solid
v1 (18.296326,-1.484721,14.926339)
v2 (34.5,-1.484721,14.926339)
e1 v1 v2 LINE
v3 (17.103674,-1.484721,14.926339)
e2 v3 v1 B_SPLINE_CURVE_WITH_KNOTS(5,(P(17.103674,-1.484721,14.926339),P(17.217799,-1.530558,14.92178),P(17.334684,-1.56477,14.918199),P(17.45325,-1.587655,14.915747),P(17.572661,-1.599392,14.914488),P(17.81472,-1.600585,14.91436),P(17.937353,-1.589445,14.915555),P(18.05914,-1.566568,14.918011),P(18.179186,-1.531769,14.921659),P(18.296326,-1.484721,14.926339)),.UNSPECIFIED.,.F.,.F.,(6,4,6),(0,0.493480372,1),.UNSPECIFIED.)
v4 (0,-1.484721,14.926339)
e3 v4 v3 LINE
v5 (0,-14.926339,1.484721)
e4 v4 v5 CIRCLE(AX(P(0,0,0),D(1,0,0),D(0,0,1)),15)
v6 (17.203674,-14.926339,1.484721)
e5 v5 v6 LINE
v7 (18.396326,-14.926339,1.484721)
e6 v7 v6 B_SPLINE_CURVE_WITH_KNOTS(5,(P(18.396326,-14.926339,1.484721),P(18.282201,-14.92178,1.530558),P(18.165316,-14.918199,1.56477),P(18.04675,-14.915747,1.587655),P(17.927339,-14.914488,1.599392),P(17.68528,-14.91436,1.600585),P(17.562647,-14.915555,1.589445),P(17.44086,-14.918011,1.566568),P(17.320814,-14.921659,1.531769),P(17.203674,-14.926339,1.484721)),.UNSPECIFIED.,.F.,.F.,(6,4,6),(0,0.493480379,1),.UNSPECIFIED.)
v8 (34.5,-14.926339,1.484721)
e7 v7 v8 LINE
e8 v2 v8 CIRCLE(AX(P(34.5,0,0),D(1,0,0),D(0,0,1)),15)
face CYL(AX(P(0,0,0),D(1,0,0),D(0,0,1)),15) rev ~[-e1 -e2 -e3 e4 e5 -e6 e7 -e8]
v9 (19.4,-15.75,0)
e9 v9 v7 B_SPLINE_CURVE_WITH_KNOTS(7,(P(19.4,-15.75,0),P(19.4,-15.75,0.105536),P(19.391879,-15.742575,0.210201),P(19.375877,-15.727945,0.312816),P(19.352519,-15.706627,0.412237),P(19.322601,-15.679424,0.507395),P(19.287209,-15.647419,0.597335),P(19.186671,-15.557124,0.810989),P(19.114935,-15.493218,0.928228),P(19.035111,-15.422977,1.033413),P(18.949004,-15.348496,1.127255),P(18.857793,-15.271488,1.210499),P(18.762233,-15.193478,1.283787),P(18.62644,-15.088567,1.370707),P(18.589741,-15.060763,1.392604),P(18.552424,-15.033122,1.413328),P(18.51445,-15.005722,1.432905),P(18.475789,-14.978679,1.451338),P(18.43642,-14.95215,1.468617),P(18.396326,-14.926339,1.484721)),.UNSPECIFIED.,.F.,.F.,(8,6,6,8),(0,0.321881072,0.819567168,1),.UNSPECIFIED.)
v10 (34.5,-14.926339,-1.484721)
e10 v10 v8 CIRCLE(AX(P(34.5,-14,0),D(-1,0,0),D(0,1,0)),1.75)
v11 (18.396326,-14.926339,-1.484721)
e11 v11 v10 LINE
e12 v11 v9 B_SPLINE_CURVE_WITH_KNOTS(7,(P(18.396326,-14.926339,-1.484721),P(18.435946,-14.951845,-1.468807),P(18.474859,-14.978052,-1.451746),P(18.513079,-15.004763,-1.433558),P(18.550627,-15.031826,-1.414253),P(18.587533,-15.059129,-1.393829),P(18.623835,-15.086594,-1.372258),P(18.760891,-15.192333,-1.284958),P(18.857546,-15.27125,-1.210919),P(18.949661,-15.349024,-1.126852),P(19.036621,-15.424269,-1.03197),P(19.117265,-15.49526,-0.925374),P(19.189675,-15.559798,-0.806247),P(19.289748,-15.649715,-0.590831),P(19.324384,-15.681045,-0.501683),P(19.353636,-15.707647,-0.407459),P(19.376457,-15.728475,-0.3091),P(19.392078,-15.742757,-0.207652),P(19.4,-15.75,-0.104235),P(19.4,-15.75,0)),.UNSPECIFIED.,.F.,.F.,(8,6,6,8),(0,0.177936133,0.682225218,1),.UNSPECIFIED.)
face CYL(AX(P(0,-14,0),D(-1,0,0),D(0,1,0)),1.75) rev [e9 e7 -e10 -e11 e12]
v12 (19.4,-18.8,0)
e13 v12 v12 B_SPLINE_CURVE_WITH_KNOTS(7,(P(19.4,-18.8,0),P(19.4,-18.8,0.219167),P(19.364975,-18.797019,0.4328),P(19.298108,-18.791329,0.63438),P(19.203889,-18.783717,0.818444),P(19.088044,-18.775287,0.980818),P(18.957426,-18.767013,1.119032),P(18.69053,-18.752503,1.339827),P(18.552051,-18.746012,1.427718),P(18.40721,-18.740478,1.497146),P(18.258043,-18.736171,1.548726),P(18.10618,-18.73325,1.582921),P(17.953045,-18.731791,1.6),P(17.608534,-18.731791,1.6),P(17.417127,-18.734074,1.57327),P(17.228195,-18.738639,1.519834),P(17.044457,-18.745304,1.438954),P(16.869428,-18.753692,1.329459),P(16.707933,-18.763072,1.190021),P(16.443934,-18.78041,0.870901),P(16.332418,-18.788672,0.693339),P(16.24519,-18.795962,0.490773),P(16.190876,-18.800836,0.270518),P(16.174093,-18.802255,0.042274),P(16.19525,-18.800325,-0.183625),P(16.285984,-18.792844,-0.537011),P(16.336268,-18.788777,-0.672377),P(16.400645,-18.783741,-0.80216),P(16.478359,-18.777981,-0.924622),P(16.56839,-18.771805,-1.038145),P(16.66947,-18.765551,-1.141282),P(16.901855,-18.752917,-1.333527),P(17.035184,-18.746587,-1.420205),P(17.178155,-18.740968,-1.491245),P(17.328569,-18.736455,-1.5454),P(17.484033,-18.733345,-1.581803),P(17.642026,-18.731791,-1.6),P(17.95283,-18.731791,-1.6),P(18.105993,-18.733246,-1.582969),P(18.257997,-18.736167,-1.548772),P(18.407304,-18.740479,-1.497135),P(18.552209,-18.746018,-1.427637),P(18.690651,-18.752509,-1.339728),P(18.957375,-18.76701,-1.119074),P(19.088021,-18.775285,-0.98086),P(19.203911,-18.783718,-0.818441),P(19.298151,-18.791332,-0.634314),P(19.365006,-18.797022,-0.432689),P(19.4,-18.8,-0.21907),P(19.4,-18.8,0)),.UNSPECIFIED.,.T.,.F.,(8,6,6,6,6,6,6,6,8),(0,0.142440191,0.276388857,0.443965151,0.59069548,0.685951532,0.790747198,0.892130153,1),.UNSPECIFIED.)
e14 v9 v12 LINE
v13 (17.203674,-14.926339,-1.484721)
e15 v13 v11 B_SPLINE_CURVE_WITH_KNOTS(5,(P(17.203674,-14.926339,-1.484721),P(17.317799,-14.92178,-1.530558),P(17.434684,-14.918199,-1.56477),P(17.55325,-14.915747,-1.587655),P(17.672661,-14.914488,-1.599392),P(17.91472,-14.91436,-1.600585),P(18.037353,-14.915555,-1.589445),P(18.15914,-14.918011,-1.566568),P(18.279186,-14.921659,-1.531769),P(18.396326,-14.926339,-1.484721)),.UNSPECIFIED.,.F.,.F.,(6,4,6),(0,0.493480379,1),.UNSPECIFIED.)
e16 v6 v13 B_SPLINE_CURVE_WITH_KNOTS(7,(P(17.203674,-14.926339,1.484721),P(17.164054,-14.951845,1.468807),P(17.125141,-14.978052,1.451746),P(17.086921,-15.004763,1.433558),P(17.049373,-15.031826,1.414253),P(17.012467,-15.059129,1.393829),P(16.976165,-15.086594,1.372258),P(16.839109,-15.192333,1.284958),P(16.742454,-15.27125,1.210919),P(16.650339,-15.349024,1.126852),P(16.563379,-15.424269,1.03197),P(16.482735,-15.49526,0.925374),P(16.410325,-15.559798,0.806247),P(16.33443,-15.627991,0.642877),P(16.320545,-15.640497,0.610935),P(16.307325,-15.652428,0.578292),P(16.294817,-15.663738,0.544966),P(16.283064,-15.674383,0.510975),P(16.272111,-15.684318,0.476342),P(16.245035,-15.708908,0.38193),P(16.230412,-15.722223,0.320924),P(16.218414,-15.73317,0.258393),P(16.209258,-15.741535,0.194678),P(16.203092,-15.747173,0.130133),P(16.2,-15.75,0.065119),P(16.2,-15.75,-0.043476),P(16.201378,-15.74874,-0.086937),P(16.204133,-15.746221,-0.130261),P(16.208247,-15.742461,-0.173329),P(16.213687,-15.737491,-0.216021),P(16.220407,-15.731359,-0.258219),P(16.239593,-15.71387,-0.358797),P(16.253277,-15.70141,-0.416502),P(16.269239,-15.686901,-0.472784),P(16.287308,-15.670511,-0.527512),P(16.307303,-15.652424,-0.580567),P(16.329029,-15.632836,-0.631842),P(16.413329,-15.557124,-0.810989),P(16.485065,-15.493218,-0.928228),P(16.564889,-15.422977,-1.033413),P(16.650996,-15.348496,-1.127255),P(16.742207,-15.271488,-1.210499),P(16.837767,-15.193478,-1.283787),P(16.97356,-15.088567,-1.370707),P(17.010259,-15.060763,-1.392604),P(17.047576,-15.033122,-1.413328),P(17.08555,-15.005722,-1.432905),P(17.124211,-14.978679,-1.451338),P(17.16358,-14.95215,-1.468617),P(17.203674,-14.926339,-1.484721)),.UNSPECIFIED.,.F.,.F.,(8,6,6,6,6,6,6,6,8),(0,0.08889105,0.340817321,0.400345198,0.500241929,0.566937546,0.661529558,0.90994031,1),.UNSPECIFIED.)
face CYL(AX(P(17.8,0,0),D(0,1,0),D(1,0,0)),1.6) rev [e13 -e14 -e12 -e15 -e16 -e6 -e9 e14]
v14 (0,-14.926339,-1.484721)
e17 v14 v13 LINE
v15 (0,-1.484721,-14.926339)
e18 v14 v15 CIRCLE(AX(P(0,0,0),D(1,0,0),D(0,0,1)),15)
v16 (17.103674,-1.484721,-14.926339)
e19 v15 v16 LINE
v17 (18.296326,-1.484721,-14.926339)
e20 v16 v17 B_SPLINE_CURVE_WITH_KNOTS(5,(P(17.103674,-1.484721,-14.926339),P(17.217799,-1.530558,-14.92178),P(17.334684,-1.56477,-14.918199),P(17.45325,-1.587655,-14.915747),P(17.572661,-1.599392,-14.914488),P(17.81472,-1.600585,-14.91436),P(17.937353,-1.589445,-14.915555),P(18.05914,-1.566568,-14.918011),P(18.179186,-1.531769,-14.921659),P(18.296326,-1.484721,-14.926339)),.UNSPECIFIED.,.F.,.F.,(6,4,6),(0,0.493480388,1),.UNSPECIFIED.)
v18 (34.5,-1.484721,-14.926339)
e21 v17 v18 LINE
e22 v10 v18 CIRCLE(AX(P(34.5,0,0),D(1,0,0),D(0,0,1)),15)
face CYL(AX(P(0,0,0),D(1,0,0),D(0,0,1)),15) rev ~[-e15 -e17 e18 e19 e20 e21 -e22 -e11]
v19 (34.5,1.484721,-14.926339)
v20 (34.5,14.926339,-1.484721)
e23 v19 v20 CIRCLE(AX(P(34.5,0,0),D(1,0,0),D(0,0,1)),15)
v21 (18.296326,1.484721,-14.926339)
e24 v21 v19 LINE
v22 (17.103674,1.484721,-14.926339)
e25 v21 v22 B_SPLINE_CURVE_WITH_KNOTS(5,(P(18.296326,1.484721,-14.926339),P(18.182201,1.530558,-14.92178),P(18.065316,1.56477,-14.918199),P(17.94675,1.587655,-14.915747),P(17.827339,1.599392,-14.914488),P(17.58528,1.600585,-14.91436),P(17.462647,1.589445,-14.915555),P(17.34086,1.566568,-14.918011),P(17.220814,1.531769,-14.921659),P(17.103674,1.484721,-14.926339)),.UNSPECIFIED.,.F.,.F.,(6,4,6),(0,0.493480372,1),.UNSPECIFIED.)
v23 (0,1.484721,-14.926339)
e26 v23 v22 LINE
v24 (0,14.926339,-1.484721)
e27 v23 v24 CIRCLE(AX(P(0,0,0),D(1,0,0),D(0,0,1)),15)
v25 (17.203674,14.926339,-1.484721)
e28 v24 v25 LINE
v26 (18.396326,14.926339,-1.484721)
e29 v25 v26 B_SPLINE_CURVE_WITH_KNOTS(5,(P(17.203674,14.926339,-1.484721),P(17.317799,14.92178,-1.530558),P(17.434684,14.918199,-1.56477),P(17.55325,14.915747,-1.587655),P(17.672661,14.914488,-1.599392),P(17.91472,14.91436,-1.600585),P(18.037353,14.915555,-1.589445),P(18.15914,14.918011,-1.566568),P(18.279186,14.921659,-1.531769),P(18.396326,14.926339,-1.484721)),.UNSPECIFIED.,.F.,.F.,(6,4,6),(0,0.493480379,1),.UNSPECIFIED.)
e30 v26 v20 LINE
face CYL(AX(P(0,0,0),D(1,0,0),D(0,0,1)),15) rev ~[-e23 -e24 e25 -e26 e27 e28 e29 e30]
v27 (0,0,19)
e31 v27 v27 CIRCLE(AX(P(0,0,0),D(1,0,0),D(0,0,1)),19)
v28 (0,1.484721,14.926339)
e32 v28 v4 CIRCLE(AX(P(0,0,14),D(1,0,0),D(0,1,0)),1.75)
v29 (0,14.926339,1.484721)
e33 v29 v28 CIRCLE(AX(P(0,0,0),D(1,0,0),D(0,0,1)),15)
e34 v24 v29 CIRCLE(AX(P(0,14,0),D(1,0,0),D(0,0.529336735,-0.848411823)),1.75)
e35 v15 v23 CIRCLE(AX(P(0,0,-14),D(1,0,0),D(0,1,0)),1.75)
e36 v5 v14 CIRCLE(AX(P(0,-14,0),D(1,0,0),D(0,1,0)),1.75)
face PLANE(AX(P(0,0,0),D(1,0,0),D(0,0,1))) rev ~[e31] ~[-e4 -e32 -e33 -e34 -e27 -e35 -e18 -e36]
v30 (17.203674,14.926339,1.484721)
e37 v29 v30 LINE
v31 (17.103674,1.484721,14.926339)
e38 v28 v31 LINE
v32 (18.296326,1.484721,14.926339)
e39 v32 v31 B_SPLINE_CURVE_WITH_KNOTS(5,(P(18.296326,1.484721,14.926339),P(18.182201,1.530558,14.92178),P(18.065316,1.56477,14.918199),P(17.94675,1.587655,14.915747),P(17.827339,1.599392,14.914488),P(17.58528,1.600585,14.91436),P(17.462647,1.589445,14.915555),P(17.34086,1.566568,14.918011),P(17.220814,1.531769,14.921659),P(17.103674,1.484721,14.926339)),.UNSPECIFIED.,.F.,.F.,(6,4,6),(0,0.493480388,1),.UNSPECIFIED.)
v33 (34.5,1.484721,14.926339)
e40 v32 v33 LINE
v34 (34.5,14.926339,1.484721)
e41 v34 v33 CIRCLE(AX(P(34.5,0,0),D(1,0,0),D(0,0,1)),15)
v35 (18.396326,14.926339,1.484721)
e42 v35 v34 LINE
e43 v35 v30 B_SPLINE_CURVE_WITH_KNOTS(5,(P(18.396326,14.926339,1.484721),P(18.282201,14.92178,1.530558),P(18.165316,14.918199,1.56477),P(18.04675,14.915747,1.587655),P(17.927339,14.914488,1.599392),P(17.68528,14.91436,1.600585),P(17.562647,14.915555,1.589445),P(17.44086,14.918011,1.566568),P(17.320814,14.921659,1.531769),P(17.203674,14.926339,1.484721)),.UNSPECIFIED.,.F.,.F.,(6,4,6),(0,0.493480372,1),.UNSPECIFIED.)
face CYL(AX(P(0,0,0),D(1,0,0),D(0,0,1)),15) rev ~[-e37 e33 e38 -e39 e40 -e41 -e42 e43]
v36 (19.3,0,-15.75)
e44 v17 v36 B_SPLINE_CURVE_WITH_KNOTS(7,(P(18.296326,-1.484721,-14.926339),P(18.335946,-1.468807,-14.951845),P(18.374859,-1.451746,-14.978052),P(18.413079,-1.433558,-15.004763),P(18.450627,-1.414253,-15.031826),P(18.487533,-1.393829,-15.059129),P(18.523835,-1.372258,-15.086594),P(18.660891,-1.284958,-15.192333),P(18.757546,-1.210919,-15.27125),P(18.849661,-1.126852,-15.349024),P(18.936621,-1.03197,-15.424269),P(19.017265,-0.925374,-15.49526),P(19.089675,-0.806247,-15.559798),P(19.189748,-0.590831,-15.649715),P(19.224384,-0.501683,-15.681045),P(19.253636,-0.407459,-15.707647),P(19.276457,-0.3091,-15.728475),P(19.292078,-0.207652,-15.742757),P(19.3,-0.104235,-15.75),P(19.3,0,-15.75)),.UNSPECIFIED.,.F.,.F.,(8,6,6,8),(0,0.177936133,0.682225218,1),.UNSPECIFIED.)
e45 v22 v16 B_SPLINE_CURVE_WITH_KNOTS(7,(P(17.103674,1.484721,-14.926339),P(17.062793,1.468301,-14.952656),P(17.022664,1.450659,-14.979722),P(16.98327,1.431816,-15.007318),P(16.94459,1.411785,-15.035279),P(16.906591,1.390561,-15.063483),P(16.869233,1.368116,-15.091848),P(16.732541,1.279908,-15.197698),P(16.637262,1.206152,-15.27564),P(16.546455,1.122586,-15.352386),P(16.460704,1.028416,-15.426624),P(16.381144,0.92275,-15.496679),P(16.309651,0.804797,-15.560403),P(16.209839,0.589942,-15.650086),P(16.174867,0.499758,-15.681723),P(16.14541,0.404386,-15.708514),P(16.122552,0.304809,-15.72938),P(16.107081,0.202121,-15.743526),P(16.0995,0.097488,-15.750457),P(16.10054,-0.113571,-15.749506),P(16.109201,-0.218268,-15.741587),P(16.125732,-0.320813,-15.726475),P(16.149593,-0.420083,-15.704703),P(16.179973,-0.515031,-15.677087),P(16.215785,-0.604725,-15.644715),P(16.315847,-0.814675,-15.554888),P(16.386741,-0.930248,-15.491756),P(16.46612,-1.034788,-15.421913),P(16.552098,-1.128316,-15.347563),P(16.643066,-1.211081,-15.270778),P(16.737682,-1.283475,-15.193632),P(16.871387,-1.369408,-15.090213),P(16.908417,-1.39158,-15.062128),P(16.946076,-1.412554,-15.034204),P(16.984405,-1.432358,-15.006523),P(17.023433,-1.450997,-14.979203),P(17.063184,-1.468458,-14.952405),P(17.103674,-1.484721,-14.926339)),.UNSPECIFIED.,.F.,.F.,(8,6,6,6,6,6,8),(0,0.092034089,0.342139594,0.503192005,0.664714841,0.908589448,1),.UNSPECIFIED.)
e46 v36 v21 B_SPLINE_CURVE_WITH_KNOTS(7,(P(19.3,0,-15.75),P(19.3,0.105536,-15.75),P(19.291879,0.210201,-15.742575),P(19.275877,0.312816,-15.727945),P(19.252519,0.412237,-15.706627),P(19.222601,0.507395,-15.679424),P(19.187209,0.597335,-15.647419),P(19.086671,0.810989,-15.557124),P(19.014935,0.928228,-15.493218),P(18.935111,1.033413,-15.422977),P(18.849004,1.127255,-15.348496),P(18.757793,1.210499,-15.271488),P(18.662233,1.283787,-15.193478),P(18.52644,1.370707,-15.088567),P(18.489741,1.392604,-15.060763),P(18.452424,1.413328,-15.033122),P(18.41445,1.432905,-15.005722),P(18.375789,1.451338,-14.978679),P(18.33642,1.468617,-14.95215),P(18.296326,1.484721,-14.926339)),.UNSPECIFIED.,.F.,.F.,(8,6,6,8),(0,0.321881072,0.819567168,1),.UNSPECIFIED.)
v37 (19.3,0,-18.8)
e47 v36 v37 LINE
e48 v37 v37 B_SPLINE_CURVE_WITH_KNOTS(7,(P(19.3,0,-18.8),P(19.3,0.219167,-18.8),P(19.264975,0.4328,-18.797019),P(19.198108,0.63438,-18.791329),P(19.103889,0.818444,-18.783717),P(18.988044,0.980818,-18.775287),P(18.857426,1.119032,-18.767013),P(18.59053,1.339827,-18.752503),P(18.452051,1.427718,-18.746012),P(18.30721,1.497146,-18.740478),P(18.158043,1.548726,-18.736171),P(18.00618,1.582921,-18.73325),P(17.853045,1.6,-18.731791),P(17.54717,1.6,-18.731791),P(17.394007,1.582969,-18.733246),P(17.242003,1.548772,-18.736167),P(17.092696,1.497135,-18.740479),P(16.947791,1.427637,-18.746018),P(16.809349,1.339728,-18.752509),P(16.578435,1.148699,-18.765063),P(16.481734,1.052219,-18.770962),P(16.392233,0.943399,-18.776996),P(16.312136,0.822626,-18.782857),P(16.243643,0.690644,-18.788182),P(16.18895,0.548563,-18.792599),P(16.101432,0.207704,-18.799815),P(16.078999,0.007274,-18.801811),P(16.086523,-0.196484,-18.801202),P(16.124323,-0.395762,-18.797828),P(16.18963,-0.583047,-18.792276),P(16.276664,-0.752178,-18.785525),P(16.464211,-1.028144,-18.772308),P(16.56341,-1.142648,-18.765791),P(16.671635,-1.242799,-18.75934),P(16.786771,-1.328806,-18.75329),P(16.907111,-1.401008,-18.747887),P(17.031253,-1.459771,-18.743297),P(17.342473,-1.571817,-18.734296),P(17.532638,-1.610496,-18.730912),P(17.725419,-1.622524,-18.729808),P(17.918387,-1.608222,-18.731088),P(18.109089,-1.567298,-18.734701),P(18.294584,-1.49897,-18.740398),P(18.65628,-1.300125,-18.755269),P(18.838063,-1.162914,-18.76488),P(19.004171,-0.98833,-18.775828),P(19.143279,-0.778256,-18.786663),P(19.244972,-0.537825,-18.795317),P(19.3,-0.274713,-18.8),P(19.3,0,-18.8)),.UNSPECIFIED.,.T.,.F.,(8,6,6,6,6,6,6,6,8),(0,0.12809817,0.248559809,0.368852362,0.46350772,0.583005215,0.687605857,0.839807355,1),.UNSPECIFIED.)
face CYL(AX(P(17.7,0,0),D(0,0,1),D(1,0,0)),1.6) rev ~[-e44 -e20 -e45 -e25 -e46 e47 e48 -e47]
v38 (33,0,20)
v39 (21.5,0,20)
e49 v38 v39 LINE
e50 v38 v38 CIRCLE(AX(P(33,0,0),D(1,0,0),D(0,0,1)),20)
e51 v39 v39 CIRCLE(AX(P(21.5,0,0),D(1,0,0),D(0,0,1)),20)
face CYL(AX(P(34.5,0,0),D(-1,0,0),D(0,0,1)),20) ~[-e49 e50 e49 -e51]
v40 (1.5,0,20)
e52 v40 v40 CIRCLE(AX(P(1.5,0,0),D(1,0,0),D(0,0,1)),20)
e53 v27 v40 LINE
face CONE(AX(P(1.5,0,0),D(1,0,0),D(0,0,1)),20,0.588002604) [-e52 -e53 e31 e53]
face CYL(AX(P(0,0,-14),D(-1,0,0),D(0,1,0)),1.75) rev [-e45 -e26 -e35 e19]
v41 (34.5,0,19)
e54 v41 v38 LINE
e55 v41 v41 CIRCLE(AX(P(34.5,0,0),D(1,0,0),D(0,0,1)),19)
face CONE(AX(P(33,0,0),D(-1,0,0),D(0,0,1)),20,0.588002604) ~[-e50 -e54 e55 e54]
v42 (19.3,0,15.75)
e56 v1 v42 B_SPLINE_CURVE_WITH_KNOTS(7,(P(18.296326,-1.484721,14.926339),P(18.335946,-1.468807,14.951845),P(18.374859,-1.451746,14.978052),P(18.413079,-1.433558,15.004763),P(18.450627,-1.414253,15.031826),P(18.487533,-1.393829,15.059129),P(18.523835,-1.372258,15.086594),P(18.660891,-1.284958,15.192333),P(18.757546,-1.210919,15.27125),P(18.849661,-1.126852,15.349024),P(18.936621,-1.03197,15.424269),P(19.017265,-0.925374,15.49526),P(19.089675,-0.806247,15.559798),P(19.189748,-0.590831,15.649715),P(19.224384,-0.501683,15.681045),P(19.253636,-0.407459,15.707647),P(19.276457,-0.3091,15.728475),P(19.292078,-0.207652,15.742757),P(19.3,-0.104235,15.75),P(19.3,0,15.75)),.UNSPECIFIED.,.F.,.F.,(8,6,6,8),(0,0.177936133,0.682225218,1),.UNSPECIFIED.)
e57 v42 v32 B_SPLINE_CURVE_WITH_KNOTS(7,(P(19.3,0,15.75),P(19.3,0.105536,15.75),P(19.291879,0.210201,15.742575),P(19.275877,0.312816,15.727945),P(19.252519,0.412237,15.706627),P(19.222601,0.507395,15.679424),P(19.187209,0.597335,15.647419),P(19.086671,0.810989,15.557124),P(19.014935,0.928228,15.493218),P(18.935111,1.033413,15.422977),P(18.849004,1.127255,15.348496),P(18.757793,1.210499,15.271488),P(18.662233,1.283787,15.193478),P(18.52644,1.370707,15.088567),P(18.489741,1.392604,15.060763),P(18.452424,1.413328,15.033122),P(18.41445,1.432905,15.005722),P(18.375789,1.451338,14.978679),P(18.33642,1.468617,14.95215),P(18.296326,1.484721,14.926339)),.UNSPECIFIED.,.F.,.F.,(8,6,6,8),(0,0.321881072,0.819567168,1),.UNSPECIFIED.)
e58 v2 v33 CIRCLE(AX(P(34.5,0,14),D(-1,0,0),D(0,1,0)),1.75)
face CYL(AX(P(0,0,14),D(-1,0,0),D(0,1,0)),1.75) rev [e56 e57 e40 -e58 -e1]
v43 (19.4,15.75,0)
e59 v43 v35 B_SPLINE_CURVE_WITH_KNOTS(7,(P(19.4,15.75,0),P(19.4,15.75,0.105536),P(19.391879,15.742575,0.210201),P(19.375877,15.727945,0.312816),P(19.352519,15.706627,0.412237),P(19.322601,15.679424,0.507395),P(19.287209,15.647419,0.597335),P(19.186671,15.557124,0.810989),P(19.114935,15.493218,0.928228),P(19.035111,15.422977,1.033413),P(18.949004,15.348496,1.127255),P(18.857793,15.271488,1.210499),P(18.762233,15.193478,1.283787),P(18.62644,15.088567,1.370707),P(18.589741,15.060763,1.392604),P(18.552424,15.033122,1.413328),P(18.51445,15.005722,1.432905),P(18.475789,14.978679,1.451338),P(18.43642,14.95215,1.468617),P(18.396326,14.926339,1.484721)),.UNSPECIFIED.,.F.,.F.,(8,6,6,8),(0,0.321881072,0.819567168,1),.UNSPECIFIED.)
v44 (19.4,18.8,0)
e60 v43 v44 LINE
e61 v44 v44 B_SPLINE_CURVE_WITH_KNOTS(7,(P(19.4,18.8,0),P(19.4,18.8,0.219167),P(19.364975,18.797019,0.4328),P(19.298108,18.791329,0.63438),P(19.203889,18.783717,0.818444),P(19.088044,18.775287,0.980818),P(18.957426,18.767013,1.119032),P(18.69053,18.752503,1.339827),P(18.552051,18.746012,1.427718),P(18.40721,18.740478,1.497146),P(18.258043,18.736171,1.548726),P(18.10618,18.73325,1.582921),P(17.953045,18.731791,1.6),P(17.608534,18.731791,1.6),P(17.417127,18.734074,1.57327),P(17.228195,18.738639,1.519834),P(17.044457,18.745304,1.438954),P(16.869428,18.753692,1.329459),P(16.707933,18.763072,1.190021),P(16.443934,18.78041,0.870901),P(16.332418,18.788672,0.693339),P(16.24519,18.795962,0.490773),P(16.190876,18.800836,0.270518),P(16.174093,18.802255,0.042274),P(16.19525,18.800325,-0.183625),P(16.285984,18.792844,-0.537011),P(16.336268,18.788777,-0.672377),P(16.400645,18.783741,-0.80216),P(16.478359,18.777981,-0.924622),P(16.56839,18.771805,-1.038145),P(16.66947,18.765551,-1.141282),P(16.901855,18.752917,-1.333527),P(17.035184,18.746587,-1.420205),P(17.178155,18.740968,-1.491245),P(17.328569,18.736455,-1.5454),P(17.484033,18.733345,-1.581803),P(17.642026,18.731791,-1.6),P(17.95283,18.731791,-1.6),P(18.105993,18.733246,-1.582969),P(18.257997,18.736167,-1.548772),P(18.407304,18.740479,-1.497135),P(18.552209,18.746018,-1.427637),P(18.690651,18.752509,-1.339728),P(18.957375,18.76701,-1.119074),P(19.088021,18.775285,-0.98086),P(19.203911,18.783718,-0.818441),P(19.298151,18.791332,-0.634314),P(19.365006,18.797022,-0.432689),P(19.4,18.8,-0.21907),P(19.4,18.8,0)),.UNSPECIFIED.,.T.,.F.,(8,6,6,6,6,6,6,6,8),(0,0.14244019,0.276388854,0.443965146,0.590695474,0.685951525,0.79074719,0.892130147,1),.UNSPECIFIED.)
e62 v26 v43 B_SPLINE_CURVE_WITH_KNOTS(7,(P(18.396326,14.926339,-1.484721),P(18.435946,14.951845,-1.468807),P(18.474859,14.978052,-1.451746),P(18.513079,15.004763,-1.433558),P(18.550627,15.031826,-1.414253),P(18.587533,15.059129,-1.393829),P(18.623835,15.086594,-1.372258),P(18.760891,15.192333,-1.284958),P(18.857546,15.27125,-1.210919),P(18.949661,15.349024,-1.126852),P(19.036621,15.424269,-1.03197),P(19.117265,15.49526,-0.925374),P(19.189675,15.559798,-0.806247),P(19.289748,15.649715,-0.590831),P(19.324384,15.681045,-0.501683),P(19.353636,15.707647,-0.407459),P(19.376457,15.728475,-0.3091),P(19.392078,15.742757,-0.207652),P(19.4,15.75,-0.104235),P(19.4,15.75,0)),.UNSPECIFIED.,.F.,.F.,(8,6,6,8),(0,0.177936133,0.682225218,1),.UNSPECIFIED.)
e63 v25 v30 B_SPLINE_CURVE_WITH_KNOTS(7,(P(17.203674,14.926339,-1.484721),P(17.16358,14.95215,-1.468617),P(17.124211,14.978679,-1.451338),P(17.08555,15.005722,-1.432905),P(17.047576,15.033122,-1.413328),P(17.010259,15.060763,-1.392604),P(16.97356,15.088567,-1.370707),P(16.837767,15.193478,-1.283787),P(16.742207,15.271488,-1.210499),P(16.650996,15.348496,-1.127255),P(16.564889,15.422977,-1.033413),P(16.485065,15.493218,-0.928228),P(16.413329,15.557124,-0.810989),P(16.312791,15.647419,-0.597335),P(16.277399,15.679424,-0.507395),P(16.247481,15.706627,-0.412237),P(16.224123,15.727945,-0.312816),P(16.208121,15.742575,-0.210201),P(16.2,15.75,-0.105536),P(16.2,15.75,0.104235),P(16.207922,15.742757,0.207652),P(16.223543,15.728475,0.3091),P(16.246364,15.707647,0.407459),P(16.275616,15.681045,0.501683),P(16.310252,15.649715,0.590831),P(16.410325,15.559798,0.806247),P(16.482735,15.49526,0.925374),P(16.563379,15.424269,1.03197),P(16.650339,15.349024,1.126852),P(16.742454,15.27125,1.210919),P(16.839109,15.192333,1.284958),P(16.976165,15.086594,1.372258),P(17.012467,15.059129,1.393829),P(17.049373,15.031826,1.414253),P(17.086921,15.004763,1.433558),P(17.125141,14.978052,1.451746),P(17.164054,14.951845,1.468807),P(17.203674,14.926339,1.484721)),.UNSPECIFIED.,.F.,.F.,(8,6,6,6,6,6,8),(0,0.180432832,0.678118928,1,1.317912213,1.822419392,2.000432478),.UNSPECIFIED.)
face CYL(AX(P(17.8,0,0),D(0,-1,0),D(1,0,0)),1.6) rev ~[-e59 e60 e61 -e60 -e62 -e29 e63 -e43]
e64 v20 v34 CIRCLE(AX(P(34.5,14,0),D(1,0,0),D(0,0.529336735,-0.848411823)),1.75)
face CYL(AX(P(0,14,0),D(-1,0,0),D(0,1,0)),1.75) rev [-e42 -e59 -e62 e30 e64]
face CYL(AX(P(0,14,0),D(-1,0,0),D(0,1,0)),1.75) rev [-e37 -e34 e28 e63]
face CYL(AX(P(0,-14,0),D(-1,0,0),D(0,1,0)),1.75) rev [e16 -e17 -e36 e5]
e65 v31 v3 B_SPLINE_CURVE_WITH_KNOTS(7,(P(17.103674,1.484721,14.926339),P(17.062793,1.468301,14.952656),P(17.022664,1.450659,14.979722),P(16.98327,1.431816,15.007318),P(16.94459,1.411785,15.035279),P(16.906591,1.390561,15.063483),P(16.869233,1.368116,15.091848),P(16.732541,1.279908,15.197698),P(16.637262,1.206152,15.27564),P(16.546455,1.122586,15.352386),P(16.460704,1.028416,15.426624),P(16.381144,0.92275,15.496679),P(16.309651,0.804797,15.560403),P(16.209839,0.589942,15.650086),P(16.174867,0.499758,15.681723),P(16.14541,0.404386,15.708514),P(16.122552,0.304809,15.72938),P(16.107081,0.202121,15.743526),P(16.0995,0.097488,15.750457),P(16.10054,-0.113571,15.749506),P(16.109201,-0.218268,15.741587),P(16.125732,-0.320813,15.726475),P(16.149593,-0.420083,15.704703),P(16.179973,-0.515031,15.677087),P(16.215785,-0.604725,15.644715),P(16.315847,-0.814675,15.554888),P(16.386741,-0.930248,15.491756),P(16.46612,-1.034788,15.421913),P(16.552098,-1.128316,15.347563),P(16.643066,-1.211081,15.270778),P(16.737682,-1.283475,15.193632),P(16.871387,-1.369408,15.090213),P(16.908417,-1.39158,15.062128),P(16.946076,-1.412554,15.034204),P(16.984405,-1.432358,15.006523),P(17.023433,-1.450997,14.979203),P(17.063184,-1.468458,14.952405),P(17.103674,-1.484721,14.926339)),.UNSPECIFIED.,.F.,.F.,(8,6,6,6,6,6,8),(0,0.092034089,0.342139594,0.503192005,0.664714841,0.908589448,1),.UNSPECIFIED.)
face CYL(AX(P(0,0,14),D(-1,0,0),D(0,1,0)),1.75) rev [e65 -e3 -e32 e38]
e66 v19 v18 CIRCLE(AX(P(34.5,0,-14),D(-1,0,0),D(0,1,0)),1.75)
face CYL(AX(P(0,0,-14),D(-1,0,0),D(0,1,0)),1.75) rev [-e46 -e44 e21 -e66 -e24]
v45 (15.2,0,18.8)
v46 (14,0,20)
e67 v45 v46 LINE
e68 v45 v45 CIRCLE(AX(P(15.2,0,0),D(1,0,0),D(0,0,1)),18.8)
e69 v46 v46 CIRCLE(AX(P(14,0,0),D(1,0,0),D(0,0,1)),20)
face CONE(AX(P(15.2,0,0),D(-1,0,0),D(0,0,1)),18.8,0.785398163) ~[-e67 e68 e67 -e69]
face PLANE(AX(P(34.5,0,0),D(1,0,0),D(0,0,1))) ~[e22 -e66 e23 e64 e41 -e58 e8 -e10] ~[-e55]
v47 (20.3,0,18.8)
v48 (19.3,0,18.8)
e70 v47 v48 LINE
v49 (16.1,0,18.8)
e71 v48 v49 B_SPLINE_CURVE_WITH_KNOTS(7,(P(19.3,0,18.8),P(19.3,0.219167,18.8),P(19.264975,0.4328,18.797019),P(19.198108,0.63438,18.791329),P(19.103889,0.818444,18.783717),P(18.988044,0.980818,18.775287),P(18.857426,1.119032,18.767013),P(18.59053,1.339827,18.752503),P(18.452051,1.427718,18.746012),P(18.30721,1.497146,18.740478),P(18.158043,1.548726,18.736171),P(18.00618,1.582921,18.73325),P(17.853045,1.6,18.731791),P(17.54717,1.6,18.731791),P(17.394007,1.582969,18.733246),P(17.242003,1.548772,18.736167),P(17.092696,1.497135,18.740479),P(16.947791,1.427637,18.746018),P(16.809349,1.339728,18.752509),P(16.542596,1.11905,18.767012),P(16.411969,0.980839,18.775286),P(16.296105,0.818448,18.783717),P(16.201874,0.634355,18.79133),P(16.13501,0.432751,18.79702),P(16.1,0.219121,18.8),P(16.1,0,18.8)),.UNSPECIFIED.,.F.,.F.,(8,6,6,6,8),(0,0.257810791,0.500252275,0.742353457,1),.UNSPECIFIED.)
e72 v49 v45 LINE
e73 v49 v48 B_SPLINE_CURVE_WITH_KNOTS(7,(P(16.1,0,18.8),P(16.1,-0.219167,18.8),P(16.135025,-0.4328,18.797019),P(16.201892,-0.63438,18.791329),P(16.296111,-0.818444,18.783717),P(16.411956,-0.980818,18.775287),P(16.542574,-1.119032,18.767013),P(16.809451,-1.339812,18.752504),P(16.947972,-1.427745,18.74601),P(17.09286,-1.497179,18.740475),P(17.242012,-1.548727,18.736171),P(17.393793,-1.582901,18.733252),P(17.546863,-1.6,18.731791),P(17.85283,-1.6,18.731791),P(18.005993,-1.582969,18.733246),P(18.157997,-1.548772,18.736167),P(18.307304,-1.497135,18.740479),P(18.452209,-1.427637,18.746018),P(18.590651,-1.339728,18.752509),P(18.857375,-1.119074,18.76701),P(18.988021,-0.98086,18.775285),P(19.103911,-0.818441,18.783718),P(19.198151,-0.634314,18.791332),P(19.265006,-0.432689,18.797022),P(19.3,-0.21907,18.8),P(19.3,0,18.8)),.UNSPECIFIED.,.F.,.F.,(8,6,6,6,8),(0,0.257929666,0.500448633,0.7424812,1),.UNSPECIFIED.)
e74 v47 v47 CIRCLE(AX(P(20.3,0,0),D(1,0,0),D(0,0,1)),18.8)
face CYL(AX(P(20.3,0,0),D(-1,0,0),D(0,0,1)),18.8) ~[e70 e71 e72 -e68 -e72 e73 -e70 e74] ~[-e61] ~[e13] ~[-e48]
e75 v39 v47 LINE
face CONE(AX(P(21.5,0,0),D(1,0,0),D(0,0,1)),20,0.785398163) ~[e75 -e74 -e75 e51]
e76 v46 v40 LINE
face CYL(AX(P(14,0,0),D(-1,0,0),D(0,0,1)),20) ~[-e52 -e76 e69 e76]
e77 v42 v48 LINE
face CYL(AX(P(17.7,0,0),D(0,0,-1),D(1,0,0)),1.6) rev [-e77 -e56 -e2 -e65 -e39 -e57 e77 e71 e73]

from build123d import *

# Parameters (mm, degrees)
F2_R          = 1.75
F3_DEPTH      = 34.501
F4_R          = 1.6
F5_DEPTH      = 20.001
F5_DEPTH_BACK = 20.001
F6_R          = 1.6
F7_DEPTH      = 20.001
F7_DEPTH_BACK = 20.001
F8_C1_SIZE2   = 1.5
F8_C1_SIZE    = 1
F8_C2_SIZE2   = 1.5
F8_C2_SIZE    = 1


# Not quite as in the source:
# - two fillets or chamfers of one size are made in one step


with BuildPart() as f1:
    # F0 (on Front) → F1 (revolve)
    with BuildSketch(Plane.XZ):
        Polygon((0, 20), (0, 15), (34.5, 15), (34.5, 20), (21.5, 20), (20.3, 18.8), (15.2, 18.8), (14, 20), align=None)
    revolve(axis=Axis((0.4285710554, 0, 0), (1, 0, 0)))

    # F2 (on Right) → F3 (cut, through all)
    with BuildSketch(Plane.YZ):
        with Locations((14, 0)):
            Circle(F2_R)
        with Locations((0, 14)):
            Circle(F2_R)
        with Locations((-14, 0)):
            Circle(F2_R)
        with Locations((0, -14)):
            Circle(F2_R)
    extrude(amount=F3_DEPTH, mode=Mode.SUBTRACT)

    # F4 (on Top) → F5 (cut, two sides)
    with BuildSketch(Plane.XY) as f5_sk:
        with Locations((17.7, 0)):
            Circle(F4_R)
    extrude(amount=-F5_DEPTH, mode=Mode.SUBTRACT)
    extrude(f5_sk.sketch, amount=F5_DEPTH_BACK, mode=Mode.SUBTRACT)

    # F6 (on Front) → F7 (cut, two sides)
    with BuildSketch(Plane.XZ) as f7_sk:
        with Locations((17.8, 0)):
            Circle(F6_R)
    extrude(amount=-F7_DEPTH, mode=Mode.SUBTRACT)
    extrude(f7_sk.sketch, amount=F7_DEPTH_BACK, mode=Mode.SUBTRACT)

    # F8: chamfer of 1.5 x 1 on 2 edges, made by hand

    # F8_c1
    f8_c1_edges = [f1.edges().sort_by_distance(p)[0] for p in [
        (0, 0, -20),
    ]]
    f8_c1_side = f1.faces().sort_by_distance((0, 0, -19.98))[0]
    chamfer(f8_c1_edges, length=F8_C1_SIZE, length2=F8_C1_SIZE2, reference=f8_c1_side)

    # F8_c2
    f8_c2_edges = [f1.edges().sort_by_distance(p)[0] for p in [
        (34.5, 0, -20),
    ]]
    f8_c2_side = f1.faces().sort_by_distance((34.5, 0, -19.98))[0]
    chamfer(f8_c2_edges, length=F8_C2_SIZE, length2=F8_C2_SIZE2, reference=f8_c2_side)


solid = f1.part
